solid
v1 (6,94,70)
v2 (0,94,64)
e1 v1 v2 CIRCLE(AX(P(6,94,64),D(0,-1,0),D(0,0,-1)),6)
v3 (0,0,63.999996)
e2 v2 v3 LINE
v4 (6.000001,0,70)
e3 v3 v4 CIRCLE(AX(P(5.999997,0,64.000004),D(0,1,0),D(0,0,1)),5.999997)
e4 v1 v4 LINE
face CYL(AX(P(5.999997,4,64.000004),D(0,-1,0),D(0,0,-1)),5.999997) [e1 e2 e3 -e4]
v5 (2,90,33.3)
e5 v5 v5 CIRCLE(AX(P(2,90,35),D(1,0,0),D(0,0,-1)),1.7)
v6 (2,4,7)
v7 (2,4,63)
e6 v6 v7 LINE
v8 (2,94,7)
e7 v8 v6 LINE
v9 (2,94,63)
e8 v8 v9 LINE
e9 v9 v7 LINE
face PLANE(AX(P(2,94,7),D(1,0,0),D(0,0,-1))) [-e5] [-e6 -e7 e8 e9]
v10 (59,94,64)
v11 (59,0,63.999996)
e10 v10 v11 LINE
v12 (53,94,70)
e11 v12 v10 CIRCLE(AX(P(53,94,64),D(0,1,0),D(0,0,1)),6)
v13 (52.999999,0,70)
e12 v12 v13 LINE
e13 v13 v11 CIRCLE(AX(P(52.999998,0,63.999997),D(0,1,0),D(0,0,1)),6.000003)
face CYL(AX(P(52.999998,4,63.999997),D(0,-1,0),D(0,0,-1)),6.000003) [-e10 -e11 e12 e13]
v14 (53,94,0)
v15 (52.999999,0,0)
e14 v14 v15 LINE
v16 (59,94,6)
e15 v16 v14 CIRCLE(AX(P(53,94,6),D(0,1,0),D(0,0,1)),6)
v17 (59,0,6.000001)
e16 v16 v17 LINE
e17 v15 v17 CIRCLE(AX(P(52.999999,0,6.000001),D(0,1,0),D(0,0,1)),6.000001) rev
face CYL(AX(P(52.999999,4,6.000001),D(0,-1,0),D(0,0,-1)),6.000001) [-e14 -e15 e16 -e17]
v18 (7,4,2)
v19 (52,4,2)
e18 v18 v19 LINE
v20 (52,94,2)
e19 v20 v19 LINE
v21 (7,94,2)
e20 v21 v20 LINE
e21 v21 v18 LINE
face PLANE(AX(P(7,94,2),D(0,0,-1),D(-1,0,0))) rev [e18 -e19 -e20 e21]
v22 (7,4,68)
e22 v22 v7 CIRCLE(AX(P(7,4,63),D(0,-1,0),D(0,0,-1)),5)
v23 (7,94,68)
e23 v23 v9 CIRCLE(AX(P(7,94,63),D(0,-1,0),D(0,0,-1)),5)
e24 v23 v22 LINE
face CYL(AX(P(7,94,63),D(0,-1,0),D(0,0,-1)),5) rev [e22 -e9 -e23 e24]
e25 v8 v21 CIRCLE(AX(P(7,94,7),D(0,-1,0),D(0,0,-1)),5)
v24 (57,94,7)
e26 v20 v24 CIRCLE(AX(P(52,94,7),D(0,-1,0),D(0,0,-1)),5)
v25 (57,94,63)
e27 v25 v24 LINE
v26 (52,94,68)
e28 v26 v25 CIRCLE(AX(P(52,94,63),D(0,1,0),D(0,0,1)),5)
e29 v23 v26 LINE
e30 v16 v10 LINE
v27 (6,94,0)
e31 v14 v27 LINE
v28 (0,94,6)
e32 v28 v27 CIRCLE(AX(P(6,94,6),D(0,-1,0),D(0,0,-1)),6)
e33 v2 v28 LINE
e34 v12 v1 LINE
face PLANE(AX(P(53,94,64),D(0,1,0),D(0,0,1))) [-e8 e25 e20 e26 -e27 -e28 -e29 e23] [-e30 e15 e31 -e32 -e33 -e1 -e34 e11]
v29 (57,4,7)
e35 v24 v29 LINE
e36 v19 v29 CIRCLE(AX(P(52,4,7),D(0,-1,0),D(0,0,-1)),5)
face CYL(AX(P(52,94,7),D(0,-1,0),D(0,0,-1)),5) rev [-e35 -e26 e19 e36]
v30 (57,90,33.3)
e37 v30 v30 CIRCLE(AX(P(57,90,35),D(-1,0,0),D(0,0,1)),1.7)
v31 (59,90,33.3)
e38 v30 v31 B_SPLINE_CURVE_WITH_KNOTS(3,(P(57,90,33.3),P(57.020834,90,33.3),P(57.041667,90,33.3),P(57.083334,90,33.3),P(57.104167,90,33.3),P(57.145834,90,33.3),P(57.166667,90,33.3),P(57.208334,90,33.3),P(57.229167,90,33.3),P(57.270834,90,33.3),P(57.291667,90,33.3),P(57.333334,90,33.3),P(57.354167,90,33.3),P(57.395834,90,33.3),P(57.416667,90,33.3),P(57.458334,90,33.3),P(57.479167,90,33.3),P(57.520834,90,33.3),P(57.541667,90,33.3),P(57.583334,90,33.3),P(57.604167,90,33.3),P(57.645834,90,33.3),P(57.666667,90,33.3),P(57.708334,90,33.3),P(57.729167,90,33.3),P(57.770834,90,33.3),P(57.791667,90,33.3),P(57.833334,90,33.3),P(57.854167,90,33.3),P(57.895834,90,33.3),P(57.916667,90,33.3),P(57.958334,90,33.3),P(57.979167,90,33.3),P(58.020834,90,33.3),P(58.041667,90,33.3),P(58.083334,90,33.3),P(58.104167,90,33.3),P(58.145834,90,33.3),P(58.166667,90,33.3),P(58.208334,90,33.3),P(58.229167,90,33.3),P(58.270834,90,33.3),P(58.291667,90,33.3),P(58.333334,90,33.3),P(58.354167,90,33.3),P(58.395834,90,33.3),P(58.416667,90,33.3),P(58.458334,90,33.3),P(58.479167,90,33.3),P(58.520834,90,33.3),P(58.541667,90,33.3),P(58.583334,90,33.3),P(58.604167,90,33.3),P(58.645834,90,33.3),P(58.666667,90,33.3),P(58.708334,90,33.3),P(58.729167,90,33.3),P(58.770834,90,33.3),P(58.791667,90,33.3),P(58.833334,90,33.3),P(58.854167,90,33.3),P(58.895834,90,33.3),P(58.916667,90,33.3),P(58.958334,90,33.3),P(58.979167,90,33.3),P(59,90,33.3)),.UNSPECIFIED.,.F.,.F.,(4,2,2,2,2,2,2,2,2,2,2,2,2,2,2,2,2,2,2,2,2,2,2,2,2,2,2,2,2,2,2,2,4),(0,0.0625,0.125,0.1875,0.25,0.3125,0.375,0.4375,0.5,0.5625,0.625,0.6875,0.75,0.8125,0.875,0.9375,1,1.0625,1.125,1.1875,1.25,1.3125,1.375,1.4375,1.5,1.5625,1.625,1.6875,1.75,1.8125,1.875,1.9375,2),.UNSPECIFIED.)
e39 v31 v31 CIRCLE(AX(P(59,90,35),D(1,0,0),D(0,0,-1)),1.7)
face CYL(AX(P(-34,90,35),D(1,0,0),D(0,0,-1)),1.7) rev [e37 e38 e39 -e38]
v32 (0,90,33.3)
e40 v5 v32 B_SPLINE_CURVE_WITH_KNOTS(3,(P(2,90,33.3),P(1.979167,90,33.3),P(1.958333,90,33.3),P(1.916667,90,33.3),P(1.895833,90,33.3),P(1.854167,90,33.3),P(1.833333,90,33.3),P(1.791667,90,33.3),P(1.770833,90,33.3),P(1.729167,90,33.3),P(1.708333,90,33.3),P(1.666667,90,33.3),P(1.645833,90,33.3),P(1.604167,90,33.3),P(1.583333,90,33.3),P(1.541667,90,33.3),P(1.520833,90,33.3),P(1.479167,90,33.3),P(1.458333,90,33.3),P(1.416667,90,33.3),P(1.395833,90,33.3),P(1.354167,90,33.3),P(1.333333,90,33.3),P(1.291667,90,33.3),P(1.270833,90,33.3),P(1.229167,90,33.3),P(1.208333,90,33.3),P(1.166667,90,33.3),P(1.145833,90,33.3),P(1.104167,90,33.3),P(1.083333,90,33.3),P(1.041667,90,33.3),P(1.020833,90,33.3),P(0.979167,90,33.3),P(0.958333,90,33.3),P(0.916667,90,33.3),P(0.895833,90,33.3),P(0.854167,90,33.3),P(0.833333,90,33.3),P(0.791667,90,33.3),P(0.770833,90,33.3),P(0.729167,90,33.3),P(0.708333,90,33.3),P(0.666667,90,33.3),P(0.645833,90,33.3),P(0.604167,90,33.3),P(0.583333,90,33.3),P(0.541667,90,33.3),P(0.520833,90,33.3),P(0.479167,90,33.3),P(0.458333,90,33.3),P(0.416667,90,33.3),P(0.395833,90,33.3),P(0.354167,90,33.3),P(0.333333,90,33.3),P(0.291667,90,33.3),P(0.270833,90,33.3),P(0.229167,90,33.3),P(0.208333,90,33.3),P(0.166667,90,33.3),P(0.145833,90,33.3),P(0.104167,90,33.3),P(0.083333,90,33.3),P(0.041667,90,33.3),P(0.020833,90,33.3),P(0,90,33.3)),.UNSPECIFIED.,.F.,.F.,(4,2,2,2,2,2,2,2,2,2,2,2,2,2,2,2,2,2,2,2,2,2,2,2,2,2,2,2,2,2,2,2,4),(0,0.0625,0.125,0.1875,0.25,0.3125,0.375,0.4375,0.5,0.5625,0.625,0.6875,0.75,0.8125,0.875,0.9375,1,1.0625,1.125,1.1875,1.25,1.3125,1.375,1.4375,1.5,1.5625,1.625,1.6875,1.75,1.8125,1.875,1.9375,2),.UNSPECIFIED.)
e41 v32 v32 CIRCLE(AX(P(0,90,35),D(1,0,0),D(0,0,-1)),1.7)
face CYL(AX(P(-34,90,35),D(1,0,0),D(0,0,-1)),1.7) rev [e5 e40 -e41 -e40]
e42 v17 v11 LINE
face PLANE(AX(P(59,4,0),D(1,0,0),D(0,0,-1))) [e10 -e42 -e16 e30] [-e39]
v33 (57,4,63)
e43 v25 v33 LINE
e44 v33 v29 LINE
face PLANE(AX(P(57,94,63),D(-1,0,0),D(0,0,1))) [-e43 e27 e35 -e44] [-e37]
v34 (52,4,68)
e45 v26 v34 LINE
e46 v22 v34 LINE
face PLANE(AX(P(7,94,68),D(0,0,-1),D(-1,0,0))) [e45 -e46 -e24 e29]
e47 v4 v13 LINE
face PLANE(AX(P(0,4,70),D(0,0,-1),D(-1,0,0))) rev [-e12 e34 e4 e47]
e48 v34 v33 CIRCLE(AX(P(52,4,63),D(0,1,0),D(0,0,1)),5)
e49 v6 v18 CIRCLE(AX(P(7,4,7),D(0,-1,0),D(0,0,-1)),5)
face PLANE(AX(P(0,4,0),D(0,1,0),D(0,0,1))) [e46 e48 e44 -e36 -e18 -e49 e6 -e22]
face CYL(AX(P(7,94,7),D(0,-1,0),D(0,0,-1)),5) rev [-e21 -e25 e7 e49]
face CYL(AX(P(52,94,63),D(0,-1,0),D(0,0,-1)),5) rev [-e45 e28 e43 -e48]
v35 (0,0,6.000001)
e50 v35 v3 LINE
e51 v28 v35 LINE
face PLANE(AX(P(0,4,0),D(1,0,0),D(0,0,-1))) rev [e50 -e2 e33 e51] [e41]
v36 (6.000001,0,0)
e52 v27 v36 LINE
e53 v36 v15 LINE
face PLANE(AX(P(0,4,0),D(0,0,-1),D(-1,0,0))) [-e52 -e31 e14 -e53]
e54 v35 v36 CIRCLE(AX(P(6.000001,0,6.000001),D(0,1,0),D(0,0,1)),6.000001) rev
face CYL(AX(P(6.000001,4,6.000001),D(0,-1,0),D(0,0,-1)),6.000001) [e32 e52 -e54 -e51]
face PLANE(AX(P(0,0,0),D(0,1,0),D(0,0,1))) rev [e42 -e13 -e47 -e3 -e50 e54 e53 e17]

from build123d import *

# Parameters (mm, degrees)
BOSS_EXTRUDE1_DEPTH = 4
BOSS_EXTRUDE2_DEPTH = 90
SKETCH4_R           = 1.7
CUT_EXTRUDE1_DEPTH  = 93


# Read off the part's stored shape, not the designer's step: Surface-Imported1
with BuildPart() as part:
    # Sketch2 → Boss-Extrude1 (new body)
    with BuildSketch(Plane(origin=(0, 0, 0), x_dir=(1, 0, 0), z_dir=(0, 1, 0))):
        with BuildLine():
            Line((6.000000983, 0), (52.999999374, 0))
            ThreePointArc((52.999999374, 0), (57.242640757, -1.757359601), (59.000000358, -6.000000983))
            Line((59.000000358, -6.000000983), (59.000000358, -63.999995589))
            ThreePointArc((59.000000358, -63.999995589), (57.242641528, -68.242638834), (52.999999374, -70.000000298))
            Line((52.999999374, -70.000000298), (6.000000983, -70.000000298))
            ThreePointArc((6.000000983, -70.000000298), (1.75735699, -68.242640674), (0, -63.999995589))
            Line((0, -63.999995589), (0, -6.000000983))
            ThreePointArc((0, -6.000000983), (1.757359601, -1.757359601), (6.000000983, 0))
        make_face()
    extrude(amount=BOSS_EXTRUDE1_DEPTH)

    # Sketch3 → Boss-Extrude2 (add)
    with BuildSketch(Plane(origin=(0, 4, 0), x_dir=(1, 0, 0), z_dir=(0, 1, 0))):
        with BuildLine():
            Line((59.000000358, -6), (59.000000358, -64.000000298))
            ThreePointArc((59.000000358, -64.000000298), (57.242641045, -68.242640985), (53.000000358, -70.000000298))
            Line((53.000000358, -70.000000298), (6, -70.000000298))
            ThreePointArc((6, -70.000000298), (1.757359313, -68.242640985), (0, -64.000000298))
            Line((0, -64.000000298), (0, -6))
            ThreePointArc((0, -6), (1.757359313, -1.757359313), (6, 0))
            Line((6, 0), (53.000000358, 0))
            ThreePointArc((53.000000358, 0), (57.242641045, -1.757359313), (59.000000358, -6))
        make_face()
        with BuildLine():
            Line((2, -7), (2, -63.000000298))
            ThreePointArc((2, -63.000000298), (3.464466094, -66.535534204), (7, -68.000000298))
            Line((7, -68.000000298), (52.000000358, -68.000000298))
            ThreePointArc((52.000000358, -68.000000298), (55.535534264, -66.535534204), (57.000000358, -63.000000298))
            Line((57.000000358, -63.000000298), (57.000000358, -7))
            ThreePointArc((57.000000358, -7), (55.535534264, -3.464466094), (52.000000358, -2))
            Line((52.000000358, -2), (7, -2))
            ThreePointArc((7, -2), (3.464466094, -3.464466094), (2, -7))
        make_face(mode=Mode.SUBTRACT)
    extrude(amount=BOSS_EXTRUDE2_DEPTH)

    # Sketch4 → Cut-Extrude1 (cut)
    with BuildSketch(Plane(origin=(59.000000358, 0, 0), x_dir=(0, 0, -1), z_dir=(1, 0, 0))):
        with Locations((-35.000000098, 90)):
            Circle(SKETCH4_R)
    extrude(amount=-CUT_EXTRUDE1_DEPTH, mode=Mode.SUBTRACT)


solid = part.part
